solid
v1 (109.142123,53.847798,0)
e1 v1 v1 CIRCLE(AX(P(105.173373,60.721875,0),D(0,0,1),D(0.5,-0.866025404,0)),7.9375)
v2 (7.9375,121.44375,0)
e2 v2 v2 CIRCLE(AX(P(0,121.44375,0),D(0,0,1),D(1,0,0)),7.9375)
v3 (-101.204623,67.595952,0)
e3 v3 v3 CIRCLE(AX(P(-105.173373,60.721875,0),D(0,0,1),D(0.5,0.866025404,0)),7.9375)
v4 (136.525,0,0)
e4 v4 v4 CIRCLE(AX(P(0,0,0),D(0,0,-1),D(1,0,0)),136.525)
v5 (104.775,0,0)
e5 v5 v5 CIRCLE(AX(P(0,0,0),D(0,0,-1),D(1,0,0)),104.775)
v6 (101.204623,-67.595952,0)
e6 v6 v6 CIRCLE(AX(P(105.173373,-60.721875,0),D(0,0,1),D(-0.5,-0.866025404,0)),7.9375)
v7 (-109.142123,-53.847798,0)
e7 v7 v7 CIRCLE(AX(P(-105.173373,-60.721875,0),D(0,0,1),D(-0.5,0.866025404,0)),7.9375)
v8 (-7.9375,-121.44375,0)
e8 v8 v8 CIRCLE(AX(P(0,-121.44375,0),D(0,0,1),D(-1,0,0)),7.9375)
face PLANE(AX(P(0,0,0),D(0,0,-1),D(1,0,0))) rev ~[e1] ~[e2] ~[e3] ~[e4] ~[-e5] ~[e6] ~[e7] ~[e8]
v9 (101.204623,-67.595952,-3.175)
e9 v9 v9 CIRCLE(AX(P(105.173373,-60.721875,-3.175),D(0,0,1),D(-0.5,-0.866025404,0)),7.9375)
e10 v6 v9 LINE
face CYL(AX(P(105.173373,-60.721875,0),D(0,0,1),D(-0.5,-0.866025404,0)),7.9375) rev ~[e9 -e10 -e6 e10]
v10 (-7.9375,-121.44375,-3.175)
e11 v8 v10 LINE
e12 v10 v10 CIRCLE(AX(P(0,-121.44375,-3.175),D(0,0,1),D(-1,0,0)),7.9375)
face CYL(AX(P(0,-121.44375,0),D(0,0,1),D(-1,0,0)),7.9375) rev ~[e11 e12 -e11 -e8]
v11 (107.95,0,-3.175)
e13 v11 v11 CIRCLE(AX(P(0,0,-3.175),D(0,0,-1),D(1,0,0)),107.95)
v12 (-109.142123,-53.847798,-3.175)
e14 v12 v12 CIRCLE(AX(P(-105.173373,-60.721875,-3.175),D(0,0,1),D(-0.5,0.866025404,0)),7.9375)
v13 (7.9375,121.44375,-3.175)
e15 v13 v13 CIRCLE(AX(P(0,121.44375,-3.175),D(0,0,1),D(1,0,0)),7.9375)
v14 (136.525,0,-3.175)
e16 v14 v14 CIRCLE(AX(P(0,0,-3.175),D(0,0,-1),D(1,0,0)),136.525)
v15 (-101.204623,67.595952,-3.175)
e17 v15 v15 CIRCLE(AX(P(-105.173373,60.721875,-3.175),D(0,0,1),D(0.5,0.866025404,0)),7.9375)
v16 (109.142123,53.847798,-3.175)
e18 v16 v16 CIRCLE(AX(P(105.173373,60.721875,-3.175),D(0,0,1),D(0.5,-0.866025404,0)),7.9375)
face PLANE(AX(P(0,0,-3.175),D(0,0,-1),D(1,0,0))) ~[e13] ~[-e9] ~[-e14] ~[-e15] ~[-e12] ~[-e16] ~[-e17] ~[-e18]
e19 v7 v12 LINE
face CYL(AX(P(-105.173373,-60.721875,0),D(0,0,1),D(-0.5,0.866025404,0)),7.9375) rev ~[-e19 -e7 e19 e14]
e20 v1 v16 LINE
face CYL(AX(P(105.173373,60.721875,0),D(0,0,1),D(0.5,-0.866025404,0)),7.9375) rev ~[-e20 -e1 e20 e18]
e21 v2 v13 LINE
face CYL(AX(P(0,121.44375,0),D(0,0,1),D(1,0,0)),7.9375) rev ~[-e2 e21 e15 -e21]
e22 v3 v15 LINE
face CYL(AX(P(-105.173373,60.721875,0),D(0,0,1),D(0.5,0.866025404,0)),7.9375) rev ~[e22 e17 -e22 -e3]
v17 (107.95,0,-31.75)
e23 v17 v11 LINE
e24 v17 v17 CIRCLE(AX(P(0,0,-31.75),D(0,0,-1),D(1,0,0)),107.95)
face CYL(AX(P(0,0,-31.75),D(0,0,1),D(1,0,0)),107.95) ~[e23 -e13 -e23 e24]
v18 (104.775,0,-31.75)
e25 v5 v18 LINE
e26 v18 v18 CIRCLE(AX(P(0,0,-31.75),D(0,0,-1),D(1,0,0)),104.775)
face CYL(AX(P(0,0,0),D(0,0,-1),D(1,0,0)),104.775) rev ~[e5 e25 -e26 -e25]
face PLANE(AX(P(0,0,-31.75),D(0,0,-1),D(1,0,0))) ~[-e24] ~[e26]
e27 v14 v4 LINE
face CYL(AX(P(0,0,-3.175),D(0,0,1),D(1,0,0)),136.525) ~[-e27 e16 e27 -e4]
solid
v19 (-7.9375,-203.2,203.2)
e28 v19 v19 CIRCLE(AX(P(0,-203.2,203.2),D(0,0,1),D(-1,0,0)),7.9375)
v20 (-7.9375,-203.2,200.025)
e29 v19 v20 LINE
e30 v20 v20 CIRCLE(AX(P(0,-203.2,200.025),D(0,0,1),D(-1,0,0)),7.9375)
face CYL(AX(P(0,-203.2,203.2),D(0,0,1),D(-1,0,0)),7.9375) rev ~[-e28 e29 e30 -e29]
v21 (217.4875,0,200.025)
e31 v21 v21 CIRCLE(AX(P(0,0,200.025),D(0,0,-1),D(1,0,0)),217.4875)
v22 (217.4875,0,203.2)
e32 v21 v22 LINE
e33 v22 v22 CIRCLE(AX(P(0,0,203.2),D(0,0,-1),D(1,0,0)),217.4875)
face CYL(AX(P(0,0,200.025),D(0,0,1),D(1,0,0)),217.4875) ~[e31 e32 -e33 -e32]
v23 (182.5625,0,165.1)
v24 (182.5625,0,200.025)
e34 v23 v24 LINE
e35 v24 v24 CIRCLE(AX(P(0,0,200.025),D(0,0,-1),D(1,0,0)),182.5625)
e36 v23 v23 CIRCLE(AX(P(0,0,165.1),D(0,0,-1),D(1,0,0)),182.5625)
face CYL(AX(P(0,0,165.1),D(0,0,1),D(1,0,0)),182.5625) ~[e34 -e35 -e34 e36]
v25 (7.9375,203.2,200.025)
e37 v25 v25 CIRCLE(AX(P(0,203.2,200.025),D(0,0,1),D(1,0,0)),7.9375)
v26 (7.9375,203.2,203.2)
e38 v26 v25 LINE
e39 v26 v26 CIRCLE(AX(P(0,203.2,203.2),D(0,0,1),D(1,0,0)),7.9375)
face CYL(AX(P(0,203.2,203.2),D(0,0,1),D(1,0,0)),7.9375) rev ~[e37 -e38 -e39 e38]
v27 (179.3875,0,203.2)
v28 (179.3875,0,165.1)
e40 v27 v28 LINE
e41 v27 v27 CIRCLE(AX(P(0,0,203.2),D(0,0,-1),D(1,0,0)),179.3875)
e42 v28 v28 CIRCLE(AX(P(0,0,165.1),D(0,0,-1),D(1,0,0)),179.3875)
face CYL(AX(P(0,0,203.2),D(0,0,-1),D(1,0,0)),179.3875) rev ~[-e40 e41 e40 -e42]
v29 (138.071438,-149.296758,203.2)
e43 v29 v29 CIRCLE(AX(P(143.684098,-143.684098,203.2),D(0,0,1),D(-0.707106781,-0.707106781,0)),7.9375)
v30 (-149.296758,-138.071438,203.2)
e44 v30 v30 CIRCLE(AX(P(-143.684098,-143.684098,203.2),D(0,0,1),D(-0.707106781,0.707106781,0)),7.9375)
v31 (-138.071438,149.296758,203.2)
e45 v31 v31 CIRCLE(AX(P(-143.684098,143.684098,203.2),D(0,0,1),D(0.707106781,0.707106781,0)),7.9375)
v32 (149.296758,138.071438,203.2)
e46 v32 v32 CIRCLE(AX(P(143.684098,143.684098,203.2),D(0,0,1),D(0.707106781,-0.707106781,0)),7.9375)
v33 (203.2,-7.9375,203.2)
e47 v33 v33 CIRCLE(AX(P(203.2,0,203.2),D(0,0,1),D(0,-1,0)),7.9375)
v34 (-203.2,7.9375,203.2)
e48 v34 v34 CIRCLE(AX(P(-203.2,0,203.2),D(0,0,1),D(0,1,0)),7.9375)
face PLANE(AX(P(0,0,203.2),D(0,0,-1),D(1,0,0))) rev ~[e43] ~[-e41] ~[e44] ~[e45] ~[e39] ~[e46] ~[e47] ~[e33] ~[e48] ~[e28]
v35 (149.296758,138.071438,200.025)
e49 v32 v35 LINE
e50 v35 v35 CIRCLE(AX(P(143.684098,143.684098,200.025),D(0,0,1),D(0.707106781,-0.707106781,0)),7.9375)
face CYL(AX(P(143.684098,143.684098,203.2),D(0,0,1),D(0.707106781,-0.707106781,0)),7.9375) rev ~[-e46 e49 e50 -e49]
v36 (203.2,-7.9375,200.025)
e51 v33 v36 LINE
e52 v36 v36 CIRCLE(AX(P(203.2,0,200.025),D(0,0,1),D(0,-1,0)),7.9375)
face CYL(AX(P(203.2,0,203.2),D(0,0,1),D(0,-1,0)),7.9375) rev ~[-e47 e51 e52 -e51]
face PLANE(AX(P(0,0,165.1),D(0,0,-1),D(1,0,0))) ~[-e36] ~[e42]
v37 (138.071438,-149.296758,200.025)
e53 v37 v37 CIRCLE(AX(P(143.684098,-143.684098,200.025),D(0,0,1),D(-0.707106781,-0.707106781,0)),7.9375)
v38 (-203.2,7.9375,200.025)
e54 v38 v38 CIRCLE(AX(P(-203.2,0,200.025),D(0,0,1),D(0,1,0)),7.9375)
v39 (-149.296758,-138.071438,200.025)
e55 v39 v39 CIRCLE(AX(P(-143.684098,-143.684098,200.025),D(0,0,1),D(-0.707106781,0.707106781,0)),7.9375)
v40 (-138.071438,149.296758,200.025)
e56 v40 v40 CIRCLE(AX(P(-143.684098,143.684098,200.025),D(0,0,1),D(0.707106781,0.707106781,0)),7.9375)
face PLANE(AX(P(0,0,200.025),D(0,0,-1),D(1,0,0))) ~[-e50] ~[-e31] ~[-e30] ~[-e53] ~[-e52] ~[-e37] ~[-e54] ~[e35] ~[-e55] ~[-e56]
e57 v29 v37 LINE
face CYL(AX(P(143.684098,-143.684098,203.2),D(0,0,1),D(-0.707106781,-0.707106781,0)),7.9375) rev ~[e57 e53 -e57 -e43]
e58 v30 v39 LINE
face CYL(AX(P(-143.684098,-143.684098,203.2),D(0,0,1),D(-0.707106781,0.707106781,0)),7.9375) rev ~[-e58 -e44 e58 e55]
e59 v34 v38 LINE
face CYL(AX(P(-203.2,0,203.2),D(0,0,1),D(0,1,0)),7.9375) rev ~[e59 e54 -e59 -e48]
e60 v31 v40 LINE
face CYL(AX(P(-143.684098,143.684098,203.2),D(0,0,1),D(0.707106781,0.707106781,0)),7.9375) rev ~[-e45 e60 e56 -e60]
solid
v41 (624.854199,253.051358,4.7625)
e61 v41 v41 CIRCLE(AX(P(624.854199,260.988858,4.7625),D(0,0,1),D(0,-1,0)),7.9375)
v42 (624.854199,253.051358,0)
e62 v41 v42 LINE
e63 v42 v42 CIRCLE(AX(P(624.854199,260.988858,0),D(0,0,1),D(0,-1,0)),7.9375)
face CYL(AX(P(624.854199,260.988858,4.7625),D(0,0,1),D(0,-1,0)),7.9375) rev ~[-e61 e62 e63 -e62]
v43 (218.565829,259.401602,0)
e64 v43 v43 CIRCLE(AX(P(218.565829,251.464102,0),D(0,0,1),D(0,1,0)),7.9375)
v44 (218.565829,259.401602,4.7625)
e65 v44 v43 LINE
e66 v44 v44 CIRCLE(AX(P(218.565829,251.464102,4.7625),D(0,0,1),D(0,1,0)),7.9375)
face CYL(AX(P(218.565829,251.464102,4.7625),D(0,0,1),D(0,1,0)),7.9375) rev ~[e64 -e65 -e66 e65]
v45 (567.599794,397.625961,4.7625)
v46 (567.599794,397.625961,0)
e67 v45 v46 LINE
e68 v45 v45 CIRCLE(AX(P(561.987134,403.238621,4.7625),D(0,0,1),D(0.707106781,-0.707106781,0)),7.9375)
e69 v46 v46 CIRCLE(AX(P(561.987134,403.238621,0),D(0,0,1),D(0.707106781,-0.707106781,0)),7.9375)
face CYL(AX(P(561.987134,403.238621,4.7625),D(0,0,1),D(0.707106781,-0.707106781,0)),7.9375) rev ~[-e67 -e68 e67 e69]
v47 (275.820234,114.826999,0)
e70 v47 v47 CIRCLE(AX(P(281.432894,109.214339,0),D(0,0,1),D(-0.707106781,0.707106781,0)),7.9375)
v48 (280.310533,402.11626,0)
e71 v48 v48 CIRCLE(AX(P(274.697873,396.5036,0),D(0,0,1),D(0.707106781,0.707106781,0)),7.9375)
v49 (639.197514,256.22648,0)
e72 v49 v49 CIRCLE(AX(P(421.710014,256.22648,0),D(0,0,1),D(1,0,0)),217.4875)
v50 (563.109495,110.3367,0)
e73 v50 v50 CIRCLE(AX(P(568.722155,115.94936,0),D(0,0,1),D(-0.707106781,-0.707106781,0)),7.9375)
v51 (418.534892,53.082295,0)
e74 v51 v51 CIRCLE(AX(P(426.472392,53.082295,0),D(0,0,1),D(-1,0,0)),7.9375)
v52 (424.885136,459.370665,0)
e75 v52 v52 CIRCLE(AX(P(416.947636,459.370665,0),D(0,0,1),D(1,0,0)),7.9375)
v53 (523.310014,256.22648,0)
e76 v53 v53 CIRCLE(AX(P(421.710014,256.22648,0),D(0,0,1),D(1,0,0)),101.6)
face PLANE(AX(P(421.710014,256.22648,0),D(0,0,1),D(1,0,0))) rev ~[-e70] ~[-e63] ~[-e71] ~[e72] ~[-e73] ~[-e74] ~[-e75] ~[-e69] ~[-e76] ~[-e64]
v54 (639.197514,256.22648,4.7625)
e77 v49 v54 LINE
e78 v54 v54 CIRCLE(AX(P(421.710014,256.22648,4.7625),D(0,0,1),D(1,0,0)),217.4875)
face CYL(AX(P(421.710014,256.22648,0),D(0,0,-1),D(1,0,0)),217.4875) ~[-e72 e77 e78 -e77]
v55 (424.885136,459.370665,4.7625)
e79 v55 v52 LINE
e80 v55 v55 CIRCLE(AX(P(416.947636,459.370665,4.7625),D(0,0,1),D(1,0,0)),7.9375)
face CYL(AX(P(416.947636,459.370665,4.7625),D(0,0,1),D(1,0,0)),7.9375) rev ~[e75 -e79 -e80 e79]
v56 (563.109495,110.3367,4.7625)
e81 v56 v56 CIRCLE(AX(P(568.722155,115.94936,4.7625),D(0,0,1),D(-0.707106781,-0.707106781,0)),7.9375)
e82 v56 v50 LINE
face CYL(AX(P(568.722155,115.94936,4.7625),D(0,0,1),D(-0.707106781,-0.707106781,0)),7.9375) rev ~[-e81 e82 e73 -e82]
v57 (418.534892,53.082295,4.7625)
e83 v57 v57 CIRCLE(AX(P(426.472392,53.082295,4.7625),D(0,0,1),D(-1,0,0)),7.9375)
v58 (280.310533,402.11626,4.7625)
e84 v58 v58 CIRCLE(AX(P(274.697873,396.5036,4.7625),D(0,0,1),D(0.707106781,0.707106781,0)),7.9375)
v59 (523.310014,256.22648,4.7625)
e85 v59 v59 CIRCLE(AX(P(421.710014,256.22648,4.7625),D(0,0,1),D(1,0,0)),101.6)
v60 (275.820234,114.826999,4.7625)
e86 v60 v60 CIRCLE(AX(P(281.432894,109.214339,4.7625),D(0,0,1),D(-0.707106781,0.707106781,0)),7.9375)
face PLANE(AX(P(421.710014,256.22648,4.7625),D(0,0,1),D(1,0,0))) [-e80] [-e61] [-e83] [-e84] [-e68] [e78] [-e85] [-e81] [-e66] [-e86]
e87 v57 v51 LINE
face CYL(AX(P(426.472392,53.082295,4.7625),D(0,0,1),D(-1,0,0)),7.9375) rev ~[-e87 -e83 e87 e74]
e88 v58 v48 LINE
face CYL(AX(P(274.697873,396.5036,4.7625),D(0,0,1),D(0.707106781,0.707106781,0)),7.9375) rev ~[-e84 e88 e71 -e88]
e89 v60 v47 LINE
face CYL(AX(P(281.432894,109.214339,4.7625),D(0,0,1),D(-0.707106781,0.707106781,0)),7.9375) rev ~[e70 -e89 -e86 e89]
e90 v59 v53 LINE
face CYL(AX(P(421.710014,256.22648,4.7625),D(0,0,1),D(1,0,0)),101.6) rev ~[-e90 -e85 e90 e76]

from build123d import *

# Parameters (mm, degrees)
F2_R             = 7.9375
F3_DEPTH         = 25.4
F3_COPIES_COUNT  = 6
F6_R             = 7.9375
F7_DEPTH         = 25.4
F7_COPIES_COUNT  = 8
F8_R             = 217.4875
F9_DEPTH         = 4.7625
F10_R            = 7.9375
F11_DEPTH        = 25.4
F11_COPIES_COUNT = 8
F12_R            = 101.6
F13_DEPTH        = 25.4


# Not quite as in the source:
# - a pattern or mirror of a feature is missing from the dataset's text; its kind, count and spacing are read off the source's solid


with BuildPart() as f1:
    # F0 (on Front) → F1 (revolve)
    with BuildSketch(Plane.XZ):
        Polygon((136.525, 0), (104.775, 0), (104.775, -31.75), (107.95, -31.75), (107.95, -3.175), (136.525, -3.175), align=None)
    revolve(axis=Axis((0, 0, 35.2586749941), (0, 0, -1)))

    # F2 (on face) → F3 (cut)
    with BuildSketch(Plane.XY):
        with Locations((0, 121.44375)):
            Circle(F2_R)
    f3 = extrude(amount=-F3_DEPTH, mode=Mode.SUBTRACT)

    # F3_copies: F3 ×6 about axis
    f3_copies_axis = Axis((0, 0, 0), (0, 0, 1))
    for i in range(1, F3_COPIES_COUNT):
        add(f3.rotate(f3_copies_axis, i * 360 / F3_COPIES_COUNT), mode=Mode.SUBTRACT)


with BuildPart() as f5:
    # F4 (on Front) → F5 (revolve)
    with BuildSketch(Plane.XZ):
        Polygon((217.4875, 203.2), (179.3875, 203.2), (179.3875, 165.1), (182.5625, 165.1), (182.5625, 200.025), (217.4875, 200.025), align=None)
    revolve(axis=Axis((0, 0, 35.2586749941), (0, 0, -1)))

    # F6 (on face) → F7 (cut)
    with BuildSketch(Plane.XY.offset(203.2)):
        with Locations((0, 203.2)):
            Circle(F6_R)
    f7 = extrude(amount=-F7_DEPTH, mode=Mode.SUBTRACT)

    # F7_copies: F7 ×8 about axis
    f7_copies_axis = Axis((0, 0, 0), (0, 0, 1))
    for i in range(1, F7_COPIES_COUNT):
        add(f7.rotate(f7_copies_axis, i * 360 / F7_COPIES_COUNT), mode=Mode.SUBTRACT)


with BuildPart() as f9:
    # F8 (on Top) → F9 (new body)
    with BuildSketch(Plane.XY):
        with Locations((421.7100143433, 256.2264800072)):
            Circle(F8_R)
    extrude(amount=F9_DEPTH)

    # F10 (on face) → F11 (cut)
    with BuildSketch(Plane.XY.offset(4.7625)):
        with Locations((416.9476355011, 459.3706646342)):
            Circle(F10_R)
    f11 = extrude(amount=-F11_DEPTH, mode=Mode.SUBTRACT)

    # F11_copies: F11 ×8 about axis
    f11_copies_axis = Axis((421.710014, 256.22648, 0), (0, 0, 1))
    for i in range(1, F11_COPIES_COUNT):
        add(f11.rotate(f11_copies_axis, i * 360 / F11_COPIES_COUNT), mode=Mode.SUBTRACT)

    # F12 (on face) → F13 (cut)
    with BuildSketch(Plane.XY.offset(4.7625)):
        with Locations((421.7100143433, 256.2264800072)):
            Circle(F12_R)
    extrude(amount=-F13_DEPTH, mode=Mode.SUBTRACT)


solid = Compound([f1.part, f5.part, f9.part])
